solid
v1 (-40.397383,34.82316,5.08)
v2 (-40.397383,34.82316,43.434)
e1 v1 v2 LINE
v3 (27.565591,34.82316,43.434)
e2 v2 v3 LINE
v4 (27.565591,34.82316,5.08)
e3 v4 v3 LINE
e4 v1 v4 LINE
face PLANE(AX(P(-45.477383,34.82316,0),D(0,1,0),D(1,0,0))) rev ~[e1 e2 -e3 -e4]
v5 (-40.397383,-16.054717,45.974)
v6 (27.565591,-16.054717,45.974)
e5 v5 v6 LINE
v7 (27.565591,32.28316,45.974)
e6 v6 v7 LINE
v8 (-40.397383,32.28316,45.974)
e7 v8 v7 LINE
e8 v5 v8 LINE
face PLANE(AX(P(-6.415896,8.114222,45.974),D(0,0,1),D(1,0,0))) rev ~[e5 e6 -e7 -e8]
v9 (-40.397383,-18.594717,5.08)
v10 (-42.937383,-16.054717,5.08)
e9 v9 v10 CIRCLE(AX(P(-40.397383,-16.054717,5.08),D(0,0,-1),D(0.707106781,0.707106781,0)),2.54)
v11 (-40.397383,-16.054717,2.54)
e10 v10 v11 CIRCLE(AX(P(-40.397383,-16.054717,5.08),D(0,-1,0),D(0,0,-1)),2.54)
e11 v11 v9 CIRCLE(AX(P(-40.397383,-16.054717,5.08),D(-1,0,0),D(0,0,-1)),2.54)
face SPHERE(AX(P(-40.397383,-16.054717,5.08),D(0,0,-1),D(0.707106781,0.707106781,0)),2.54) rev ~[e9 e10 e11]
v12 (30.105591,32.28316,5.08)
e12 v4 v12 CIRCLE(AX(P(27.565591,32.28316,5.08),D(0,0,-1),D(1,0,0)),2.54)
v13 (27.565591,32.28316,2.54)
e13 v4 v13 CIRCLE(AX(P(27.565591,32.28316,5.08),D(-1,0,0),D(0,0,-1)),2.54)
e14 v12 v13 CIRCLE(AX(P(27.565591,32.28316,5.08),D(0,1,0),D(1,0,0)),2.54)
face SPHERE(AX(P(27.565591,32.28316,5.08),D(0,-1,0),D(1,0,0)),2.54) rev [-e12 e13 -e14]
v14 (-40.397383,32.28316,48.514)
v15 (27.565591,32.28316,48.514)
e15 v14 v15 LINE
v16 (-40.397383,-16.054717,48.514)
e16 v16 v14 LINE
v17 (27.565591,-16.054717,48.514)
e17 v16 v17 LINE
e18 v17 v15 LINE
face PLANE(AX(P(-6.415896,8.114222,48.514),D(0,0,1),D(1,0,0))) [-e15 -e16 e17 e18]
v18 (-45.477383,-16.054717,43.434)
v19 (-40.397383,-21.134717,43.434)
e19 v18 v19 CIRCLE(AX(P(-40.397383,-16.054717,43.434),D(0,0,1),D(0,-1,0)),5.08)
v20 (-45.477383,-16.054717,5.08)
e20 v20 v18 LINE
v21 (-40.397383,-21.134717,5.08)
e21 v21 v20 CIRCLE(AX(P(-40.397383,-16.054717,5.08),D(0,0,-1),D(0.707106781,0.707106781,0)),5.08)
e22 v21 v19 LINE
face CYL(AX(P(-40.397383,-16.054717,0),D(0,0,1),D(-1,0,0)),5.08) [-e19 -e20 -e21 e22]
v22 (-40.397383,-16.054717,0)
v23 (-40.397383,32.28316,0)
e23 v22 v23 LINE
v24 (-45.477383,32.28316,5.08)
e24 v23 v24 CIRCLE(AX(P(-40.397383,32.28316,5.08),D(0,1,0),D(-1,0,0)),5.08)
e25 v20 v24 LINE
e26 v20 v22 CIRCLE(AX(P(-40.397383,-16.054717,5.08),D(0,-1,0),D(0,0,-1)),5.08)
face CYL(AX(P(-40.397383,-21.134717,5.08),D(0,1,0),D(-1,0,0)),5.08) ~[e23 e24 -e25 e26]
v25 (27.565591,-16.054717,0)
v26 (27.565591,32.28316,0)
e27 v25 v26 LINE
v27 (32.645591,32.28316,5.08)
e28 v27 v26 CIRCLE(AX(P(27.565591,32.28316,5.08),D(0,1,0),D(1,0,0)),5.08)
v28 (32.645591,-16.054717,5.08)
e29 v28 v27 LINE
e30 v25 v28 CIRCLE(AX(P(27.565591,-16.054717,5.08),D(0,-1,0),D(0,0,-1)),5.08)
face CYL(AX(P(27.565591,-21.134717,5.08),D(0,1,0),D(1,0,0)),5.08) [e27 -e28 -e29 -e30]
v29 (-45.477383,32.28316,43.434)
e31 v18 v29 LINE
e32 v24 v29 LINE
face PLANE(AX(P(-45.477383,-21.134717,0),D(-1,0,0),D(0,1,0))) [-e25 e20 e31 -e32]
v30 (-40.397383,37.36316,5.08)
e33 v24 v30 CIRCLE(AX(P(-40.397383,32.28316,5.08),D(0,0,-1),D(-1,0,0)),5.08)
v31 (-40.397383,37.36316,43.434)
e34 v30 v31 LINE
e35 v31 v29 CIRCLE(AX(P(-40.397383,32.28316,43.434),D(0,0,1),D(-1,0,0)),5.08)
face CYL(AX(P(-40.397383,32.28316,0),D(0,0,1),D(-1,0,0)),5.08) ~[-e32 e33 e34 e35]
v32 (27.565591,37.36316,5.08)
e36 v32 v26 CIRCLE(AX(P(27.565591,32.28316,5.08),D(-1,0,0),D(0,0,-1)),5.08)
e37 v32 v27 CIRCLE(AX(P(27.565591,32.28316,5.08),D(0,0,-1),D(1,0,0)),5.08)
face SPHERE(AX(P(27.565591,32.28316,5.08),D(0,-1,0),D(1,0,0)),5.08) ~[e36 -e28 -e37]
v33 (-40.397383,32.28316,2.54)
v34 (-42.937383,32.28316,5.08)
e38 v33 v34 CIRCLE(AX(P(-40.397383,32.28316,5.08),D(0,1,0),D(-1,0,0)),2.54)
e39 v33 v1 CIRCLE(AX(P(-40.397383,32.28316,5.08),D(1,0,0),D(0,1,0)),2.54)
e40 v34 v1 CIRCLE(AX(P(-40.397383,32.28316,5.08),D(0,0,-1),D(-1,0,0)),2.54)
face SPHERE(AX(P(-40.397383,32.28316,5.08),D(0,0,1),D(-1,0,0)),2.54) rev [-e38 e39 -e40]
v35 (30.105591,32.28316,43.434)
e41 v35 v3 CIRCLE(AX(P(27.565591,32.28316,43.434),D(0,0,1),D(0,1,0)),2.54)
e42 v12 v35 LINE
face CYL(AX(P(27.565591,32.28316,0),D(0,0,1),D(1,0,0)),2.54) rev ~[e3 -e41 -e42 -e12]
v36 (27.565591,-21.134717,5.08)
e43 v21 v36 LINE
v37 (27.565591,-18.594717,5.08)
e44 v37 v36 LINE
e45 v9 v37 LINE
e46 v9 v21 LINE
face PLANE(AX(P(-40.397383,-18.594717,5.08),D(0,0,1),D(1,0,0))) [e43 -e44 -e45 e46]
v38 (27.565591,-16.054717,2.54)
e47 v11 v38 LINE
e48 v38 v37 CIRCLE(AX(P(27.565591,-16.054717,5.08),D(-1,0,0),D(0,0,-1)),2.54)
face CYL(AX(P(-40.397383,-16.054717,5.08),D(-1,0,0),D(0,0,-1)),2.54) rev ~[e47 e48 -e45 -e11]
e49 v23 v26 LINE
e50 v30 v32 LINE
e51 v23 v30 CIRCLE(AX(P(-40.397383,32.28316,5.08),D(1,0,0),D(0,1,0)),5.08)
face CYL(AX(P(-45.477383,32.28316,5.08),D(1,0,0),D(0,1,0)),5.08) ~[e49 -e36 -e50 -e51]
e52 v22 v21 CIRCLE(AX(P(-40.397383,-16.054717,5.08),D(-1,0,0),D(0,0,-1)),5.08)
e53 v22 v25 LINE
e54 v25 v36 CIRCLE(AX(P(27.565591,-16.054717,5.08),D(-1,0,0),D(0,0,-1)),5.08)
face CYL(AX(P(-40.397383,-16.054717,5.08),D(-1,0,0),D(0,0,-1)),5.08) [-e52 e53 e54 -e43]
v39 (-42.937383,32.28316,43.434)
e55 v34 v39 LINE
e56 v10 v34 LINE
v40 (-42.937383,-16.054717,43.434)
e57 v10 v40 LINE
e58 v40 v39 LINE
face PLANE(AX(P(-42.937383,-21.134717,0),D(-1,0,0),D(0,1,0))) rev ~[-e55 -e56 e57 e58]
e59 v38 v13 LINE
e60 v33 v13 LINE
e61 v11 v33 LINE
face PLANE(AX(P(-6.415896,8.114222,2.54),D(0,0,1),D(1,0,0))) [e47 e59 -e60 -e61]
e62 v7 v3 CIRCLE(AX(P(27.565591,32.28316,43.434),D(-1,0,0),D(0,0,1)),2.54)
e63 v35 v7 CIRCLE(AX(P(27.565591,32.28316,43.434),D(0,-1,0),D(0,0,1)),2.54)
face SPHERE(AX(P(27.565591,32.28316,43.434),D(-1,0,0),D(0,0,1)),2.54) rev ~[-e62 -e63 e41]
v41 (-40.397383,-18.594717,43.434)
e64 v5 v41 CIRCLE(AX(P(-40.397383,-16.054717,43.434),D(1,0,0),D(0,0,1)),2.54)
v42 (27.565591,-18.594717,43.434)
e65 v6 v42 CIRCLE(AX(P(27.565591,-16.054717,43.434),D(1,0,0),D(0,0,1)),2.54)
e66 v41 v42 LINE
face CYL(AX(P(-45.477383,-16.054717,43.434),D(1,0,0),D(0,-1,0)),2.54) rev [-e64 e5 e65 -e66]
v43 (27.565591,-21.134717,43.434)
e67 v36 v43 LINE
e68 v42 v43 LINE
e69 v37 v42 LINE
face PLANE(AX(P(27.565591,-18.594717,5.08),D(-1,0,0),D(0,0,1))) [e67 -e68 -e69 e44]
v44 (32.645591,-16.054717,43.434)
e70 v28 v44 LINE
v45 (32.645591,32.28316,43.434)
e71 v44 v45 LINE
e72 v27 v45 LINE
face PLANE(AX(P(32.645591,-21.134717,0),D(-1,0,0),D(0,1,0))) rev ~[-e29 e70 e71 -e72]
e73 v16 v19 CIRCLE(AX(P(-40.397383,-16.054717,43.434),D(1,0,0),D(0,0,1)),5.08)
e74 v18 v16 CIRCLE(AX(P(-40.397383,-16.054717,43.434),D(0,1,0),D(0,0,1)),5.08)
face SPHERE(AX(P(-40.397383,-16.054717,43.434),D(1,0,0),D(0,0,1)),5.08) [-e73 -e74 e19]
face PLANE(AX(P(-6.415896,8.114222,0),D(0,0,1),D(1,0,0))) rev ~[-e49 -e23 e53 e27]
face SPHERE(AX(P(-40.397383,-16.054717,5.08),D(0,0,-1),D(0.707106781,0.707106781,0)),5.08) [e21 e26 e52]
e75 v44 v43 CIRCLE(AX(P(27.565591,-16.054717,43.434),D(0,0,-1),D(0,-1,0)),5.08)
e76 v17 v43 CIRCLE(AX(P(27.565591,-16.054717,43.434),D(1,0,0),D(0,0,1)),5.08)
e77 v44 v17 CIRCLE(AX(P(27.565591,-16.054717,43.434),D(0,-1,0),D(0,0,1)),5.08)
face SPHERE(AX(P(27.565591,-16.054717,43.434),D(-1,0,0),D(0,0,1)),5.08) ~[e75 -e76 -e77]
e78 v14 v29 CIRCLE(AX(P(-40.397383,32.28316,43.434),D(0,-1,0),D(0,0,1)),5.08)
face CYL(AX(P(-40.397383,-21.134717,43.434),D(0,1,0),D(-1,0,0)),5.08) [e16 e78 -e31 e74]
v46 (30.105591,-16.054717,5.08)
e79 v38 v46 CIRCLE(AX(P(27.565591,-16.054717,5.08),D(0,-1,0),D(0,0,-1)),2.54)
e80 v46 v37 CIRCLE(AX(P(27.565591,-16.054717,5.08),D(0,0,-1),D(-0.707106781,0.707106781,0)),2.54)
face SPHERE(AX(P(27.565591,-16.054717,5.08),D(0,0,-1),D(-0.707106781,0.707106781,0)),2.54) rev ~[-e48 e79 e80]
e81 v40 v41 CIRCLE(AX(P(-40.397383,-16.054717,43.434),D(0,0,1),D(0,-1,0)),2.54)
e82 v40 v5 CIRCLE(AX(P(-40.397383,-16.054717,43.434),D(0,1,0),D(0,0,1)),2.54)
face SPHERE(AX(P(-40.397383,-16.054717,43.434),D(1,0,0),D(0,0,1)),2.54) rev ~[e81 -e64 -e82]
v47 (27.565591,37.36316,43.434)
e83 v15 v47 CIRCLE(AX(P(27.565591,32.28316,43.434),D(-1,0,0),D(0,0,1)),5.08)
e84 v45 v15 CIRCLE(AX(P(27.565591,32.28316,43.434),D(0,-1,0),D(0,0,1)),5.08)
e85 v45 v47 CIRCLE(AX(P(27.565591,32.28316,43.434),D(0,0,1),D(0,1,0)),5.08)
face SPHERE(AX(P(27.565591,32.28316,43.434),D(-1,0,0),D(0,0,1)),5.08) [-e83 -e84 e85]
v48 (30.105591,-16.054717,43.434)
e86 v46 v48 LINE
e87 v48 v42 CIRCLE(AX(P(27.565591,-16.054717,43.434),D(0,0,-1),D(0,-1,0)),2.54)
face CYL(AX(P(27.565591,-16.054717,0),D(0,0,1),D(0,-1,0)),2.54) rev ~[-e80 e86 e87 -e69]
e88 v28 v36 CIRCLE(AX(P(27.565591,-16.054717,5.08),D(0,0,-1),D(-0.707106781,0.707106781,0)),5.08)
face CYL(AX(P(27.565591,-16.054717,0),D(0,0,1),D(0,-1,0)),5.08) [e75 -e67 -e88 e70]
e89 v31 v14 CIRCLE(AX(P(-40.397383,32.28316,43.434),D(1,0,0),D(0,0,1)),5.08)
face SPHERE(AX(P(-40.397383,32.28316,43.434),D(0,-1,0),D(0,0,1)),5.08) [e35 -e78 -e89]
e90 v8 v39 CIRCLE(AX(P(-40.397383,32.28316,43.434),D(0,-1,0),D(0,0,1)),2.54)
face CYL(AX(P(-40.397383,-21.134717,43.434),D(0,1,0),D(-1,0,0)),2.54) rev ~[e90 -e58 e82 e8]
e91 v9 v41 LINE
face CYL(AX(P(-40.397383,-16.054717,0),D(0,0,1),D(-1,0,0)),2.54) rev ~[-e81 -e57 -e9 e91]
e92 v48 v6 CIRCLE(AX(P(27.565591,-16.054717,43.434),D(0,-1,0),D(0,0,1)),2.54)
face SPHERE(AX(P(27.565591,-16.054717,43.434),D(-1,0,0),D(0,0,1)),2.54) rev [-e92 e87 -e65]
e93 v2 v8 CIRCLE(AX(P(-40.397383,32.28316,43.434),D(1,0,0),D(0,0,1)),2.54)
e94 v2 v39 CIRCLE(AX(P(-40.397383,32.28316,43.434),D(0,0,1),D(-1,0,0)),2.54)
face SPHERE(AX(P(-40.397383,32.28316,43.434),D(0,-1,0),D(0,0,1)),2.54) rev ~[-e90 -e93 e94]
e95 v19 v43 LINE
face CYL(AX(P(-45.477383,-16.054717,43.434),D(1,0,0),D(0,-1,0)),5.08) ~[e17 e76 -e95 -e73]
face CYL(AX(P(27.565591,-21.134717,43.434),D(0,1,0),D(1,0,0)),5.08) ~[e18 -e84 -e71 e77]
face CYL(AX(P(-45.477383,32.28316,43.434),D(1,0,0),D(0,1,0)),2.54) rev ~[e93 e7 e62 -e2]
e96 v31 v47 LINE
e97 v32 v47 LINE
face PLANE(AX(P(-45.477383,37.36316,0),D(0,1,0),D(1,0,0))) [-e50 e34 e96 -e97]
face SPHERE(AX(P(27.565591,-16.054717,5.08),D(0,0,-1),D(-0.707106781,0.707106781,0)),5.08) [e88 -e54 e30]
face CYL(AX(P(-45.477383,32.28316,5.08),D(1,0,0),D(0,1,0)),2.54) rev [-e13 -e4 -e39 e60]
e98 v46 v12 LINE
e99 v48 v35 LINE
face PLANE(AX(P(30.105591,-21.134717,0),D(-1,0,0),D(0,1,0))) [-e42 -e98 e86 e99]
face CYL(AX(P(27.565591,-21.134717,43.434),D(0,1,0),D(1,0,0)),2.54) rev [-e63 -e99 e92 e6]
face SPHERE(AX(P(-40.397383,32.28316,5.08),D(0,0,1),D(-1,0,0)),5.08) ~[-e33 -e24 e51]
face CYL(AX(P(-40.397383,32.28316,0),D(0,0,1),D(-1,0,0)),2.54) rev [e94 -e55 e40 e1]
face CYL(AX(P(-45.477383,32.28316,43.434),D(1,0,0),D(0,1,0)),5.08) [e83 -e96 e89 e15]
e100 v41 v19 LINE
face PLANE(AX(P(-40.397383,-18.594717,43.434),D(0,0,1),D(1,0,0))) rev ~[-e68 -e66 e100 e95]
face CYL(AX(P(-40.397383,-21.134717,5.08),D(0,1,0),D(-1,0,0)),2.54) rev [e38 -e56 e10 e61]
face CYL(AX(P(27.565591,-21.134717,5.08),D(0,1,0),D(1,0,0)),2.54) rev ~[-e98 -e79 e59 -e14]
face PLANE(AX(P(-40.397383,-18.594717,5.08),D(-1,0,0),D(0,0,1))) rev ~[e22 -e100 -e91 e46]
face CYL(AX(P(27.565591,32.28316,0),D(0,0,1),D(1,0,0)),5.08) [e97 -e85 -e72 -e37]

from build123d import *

# Parameters (mm, degrees)
F0_W         = 78.1229734421
F0_H         = 58.4978777915
F1_DEPTH     = 48.514
F2_R         = 5.08
F3_T1_DEPTH  = 67.9629734421
F3_S5_W      = 5.08
F3_S5_H      = 5.08
F3_T6_DEPTH  = 5.08
F3_S11_W     = 5.08
F3_S11_H     = 5.08
F3_T12_DEPTH = 5.08
F4_T         = -2.54


# Not quite as in the source:
# - a fillet or chamfer that OpenCascade refuses, or shapes differently, is made with other operations: its cross-section is extruded or revolved along the edge and cut away or added
# - a shell that OpenCascade refuses in one call is made with other operations: the cavity is built on its own and cut out


with BuildPart() as f1:
    # F0 (on Top) → F1 (new body)
    with BuildSketch(Plane.XY):
        with Locations((-6.4158961177, 8.1142215058)):
            Rectangle(F0_W, F0_H)
    extrude(amount=F1_DEPTH)

    # F2
    f2_edges = [f1.edges().sort_by_distance(p)[0] for p in [
        (-6.415896, -21.134717, 48.514),
        (-45.477383, 8.114222, 48.514),
        (-6.415896, 37.36316, 48.514),
        (32.645591, 8.114222, 48.514),
        (32.645591, -21.134717, 24.257),
        (32.645591, 8.114222, 0),
        (32.645591, 37.36316, 24.257),
        (-45.477383, -21.134717, 24.257),
        (-45.477383, 37.36316, 24.257),
        (-45.477383, 8.114222, 0),
        (-6.415896, 37.36316, 0),
    ]]
    fillet(f2_edges, radius=F2_R)

    # F3: fillet of radius 5.08 on 1 edges, made by hand

    # F3_s2 → F3_t1 (cut)
    with BuildSketch(Plane.YZ.offset(-40.3973828387)):
        with BuildLine():
            ThreePointArc((-16.0547173899, 0), (-19.6468198384, 1.4878975516), (-21.1347173899, 5.08))
            Line((-21.1347173899, 5.08), (-21.1347173899, 0))
            Line((-21.1347173899, 0), (-16.0547173899, 0))
        make_face()
    extrude(amount=F3_T1_DEPTH, mode=Mode.SUBTRACT)


with BuildPart() as f3_tool4:
    # F3_s5 → F3_t6 (new body)
    with BuildSketch(Plane.XY.offset(5.08)):
        with Locations((-42.9373828387, -18.5947173899)):
            Rectangle(F3_S5_W, F3_S5_H)
    extrude(amount=-F3_T6_DEPTH)

    # F3_s7 → F3_t8 (revolve, cut)
    with BuildSketch(Plane(origin=(-40.3973828387, -16.0547173899, 5.08), x_dir=(0.7071067812, 0.7071067812, 0), z_dir=(-0.7071067812, 0.7071067812, 0))):
        with BuildLine():
            ThreePointArc((0, -5.08), (5.08, 0), (0, 5.08))
            Line((0, 5.08), (0, -5.08))
        make_face()
    revolve(axis=Axis((-40.3973828387, -16.0547173899, 5.08), (0, 0, -1)), mode=Mode.SUBTRACT)


with BuildPart() as f1_1:
    add(f1.part)

    # F3_t3: cut F3_tool4
    add(f3_tool4.part, mode=Mode.SUBTRACT)


with BuildPart() as f3_tool10:
    # F3_s11 → F3_t12 (new body)
    with BuildSketch(Plane.XY.offset(5.08)):
        with Locations((30.1055906034, -18.5947173899)):
            Rectangle(F3_S11_W, F3_S11_H)
    extrude(amount=-F3_T12_DEPTH)

    # F3_s13 → F3_t14 (revolve, cut)
    with BuildSketch(Plane(origin=(27.5655906034, -16.0547173899, 5.08), x_dir=(-0.7071067812, 0.7071067812, 0), z_dir=(-0.7071067812, -0.7071067812, 0))):
        with BuildLine():
            ThreePointArc((0, -5.08), (5.08, 0), (0, 5.08))
            Line((0, 5.08), (0, -5.08))
        make_face()
    revolve(axis=Axis((27.5655906034, -16.0547173899, 5.08), (0, 0, -1)), mode=Mode.SUBTRACT)


with BuildPart() as f1_2:
    add(f1_1.part)

    # F3_t9: cut F3_tool10
    add(f3_tool10.part, mode=Mode.SUBTRACT)

    # F4: a shell. OpenCascade refuses it in one call, so the cavity is built on its own and cut out:
    # the body offset inwards by the wall thickness, plus a prism from it out through each open face.
    f4_core = offset(f1_2.part, amount=F4_T, mode=Mode.PRIVATE)
    f4_exits = [f4_core.faces().sort_by_distance(p)[0] for p in [
        (-6.415896, -18.594717, 24.257),
    ]]
    add(f4_core, mode=Mode.SUBTRACT)
    extrude(f4_exits, amount=-F4_T, mode=Mode.SUBTRACT)


solid = f1_2.part
